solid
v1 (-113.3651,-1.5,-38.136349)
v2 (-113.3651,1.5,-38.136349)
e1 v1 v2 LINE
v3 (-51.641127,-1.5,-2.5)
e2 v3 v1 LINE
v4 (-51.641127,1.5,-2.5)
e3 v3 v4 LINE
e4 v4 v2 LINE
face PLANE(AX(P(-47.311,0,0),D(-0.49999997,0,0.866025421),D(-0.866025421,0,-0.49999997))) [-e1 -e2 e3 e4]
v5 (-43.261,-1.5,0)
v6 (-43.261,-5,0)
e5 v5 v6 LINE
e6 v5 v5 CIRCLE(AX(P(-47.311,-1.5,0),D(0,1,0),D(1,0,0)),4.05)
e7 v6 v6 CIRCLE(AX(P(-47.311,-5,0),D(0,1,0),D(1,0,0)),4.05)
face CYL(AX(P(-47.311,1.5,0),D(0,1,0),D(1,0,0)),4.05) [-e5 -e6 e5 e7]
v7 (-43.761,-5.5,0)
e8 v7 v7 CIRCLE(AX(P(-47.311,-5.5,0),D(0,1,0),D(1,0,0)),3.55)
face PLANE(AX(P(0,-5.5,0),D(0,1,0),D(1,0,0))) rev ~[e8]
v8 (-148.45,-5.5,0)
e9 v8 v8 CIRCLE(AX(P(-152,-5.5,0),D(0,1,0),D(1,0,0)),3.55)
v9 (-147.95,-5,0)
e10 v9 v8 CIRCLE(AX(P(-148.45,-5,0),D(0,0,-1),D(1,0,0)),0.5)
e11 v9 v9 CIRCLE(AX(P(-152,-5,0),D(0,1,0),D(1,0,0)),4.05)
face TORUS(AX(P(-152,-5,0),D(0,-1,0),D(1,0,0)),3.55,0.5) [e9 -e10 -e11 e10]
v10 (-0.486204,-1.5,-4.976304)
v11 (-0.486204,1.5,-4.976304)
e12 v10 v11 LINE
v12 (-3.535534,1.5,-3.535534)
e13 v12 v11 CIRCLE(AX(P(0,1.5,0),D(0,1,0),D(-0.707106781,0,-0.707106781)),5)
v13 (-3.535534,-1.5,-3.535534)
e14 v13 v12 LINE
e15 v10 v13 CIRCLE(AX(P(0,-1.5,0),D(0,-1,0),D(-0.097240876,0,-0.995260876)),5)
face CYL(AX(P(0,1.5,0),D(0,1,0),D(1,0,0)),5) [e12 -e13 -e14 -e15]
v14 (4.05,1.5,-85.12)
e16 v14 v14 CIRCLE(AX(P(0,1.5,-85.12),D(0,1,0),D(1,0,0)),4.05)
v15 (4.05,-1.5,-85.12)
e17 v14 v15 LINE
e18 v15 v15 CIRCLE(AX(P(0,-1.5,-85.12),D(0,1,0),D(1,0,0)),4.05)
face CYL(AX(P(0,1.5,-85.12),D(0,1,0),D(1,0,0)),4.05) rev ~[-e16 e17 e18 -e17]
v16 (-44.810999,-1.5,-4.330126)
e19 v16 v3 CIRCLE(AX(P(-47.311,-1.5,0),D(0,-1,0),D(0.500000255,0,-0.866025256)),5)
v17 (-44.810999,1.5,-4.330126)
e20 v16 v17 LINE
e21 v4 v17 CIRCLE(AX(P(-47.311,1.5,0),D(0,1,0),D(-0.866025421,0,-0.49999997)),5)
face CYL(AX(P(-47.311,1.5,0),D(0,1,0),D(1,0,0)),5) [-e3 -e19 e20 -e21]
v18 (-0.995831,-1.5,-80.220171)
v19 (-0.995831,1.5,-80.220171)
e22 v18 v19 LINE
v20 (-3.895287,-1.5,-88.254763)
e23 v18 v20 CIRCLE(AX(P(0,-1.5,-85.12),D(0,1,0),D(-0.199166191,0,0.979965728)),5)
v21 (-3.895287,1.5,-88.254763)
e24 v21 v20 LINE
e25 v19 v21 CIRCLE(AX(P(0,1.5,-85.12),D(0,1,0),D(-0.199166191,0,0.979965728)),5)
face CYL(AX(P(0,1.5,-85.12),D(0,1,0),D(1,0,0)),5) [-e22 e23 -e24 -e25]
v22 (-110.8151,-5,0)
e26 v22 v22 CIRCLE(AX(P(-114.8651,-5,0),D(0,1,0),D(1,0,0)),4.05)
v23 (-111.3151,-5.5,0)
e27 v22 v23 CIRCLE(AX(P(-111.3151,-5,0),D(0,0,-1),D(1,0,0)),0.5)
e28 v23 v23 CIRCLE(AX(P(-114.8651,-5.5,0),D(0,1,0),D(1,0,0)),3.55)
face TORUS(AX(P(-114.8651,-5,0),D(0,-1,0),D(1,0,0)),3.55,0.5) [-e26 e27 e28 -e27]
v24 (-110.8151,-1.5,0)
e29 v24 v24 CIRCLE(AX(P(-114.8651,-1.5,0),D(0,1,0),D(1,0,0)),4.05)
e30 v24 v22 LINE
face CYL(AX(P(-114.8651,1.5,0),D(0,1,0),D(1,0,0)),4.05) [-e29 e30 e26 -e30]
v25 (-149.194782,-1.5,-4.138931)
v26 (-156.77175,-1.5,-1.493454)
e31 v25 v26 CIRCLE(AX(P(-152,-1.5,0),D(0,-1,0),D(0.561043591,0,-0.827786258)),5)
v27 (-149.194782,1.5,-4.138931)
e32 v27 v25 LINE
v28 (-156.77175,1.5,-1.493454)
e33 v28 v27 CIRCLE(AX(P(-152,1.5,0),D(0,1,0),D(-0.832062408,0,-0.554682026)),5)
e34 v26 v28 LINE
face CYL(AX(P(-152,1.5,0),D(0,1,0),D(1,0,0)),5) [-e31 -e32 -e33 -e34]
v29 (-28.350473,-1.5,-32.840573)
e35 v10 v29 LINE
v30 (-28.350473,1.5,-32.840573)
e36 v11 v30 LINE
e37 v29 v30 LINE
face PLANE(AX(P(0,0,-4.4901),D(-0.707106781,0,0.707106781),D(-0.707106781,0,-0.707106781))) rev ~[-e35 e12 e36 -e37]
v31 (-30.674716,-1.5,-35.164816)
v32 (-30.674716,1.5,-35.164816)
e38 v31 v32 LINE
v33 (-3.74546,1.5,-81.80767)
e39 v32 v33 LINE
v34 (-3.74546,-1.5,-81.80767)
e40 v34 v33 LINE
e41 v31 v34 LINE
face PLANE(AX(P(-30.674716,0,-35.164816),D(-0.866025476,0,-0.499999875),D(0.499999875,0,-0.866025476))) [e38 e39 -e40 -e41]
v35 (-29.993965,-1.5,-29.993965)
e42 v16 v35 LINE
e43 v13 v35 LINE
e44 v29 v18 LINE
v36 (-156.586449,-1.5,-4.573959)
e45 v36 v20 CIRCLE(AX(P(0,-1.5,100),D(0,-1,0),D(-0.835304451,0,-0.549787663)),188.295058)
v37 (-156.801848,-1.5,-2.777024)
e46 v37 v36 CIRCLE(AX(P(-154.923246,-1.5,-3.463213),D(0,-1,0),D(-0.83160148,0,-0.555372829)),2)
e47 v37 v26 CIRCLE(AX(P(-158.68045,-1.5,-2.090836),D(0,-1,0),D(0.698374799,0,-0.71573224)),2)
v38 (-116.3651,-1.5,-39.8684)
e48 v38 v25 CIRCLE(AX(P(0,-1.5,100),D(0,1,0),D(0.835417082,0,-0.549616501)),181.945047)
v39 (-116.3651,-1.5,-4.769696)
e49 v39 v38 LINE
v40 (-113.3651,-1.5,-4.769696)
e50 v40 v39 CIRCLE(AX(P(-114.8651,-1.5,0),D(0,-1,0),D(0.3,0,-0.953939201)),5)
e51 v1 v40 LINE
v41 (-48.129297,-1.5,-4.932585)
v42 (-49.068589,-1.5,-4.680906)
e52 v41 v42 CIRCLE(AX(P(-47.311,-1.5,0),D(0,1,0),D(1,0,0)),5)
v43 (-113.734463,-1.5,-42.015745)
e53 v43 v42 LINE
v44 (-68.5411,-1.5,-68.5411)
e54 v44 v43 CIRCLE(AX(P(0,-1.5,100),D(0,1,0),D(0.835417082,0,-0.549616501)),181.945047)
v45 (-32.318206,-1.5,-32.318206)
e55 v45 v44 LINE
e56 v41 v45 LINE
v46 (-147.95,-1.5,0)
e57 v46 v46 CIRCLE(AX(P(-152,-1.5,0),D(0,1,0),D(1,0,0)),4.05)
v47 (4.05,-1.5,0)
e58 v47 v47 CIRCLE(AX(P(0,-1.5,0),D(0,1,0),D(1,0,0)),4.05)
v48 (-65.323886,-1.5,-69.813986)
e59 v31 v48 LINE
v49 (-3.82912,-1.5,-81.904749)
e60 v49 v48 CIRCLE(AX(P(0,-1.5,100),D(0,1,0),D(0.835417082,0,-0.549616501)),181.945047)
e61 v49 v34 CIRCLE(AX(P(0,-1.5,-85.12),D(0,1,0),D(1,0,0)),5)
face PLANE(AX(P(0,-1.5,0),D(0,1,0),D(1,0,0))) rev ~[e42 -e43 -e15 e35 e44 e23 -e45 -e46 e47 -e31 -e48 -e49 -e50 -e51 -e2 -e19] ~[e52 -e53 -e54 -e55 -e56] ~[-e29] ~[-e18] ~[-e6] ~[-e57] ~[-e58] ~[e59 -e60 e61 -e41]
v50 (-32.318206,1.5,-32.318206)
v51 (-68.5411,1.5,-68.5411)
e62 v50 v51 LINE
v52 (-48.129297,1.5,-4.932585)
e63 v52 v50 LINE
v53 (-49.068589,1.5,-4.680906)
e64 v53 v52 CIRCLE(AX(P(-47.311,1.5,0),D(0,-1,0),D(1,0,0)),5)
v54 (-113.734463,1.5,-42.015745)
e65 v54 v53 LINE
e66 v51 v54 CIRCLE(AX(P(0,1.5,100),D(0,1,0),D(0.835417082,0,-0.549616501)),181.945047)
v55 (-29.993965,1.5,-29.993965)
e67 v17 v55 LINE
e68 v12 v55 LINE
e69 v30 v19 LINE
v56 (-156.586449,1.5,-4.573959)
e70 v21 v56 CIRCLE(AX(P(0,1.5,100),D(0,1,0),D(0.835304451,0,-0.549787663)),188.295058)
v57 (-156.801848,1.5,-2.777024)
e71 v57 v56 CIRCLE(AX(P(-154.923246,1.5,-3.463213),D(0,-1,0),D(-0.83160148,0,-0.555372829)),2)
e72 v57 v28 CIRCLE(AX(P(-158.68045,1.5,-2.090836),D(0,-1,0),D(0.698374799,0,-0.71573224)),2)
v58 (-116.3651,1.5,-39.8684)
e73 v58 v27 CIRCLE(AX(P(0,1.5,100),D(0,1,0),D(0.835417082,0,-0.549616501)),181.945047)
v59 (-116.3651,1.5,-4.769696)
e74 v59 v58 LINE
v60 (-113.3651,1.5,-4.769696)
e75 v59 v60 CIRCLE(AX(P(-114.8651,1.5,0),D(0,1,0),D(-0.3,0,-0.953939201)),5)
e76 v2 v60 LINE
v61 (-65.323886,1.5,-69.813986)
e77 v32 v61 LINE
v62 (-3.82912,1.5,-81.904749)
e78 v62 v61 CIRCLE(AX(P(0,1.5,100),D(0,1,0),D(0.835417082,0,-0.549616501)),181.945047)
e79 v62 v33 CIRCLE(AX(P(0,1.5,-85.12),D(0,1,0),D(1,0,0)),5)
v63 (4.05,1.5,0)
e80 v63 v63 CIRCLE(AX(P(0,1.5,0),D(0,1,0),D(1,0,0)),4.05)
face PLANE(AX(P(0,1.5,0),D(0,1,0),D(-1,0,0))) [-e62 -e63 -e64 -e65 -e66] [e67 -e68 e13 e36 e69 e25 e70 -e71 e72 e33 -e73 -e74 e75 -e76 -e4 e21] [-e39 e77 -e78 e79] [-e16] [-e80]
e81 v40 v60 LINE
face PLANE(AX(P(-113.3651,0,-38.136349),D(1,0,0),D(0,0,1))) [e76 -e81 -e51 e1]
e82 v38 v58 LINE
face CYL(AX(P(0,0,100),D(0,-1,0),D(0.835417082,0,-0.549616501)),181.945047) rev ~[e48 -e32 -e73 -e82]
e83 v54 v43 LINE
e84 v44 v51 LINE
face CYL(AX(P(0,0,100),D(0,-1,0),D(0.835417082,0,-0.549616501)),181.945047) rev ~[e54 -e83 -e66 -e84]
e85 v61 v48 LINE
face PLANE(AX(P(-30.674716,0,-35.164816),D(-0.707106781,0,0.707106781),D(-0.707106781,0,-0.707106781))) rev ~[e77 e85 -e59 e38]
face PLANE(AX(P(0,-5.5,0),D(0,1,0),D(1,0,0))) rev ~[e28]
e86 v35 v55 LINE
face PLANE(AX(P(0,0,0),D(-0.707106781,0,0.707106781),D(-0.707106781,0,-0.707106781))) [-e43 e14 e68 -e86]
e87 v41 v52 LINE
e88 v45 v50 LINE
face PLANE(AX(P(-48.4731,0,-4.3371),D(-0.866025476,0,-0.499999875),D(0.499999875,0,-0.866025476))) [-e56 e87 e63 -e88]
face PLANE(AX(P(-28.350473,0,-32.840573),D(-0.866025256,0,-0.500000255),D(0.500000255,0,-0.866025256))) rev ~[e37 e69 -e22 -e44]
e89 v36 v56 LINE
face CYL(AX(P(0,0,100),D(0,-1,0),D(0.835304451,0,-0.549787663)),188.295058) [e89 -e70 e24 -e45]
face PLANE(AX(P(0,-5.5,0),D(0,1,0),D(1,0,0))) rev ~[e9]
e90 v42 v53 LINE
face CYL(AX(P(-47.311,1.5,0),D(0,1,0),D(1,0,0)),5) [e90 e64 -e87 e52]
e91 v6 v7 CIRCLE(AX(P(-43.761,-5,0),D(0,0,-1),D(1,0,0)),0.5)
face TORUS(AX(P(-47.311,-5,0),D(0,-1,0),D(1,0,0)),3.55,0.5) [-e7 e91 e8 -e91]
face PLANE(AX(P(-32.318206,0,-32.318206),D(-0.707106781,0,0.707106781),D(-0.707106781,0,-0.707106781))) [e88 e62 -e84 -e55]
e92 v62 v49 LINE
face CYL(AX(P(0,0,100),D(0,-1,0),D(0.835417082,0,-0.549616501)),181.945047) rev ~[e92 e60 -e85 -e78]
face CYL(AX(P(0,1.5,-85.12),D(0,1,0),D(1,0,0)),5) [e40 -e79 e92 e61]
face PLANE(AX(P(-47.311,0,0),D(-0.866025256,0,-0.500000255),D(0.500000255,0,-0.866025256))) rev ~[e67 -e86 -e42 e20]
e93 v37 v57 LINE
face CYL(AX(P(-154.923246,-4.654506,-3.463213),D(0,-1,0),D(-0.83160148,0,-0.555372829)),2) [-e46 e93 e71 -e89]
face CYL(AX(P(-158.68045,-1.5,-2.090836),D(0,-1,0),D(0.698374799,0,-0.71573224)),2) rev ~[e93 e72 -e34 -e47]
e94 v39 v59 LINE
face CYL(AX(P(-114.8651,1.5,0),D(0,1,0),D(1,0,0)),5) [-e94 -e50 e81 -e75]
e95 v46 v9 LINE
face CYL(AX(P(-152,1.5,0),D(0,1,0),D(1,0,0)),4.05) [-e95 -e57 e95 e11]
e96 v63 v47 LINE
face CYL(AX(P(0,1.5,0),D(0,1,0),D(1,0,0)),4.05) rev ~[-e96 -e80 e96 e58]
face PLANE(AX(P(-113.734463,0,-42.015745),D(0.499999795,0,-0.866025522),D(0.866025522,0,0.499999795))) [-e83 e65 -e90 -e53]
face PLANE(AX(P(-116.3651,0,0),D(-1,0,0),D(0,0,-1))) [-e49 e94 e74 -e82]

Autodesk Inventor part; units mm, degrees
ref_plane "YZ Plane" through (0, 0, 0) normal (1, 0, 0) x (0, 1, 0)
ref_plane "XZ Plane" through (0, 0, 0) normal (0, 1, 0) x (-1, 0, 0)
ref_plane "XY Plane" through (0, 0, 0) normal (0, 0, 1) x (1, 0, 0)
sketch "Sketch1" plane through (0, 0, 0) normal (0, 1, 0) x (-1, 0, 0)
  arc A0 (-152, 0) -> (152, 0) centre (0, 100) ccw
  line L0 (0, -81.945) -> (-47.311, 0)
  line L1 (-47.311, 0) -> (47.311, 0) construction
  line L2 (47.311, 0) -> (0, -81.945)
  line L3 (0, 0) -> (68.5411, -68.5411)
  line L4 (0, 0) -> (-68.5411, -68.5411)
  line L5 (47.311, 0) -> (116.3651, -39.8684)
  line L6 (-47.311, 0) -> (-116.3651, -39.8684)
  line L7 (114.7776, -42.618) -> (48.4731, -4.3371)
  line L8 (48.4731, -4.3371) -> (0, -88.295)
  line L9 (0, -88.295) -> (-48.4731, -4.3371)
  line L10 (-48.4731, -4.3371) -> (-114.4332, -42.4192)
  line L11 (-66.0999, -70.5901) -> (0, -4.4901)
  line L12 (0, -4.4901) -> (66.2961, -70.7862)
  line L13 (116.3651, -39.8684) -> (114.7776, -42.618)
  line L14 (68.5411, -68.5411) -> (66.2961, -70.7862)
  line L15 (-66.0999, -70.5901) -> (-67.8825, -68.8075)
  line L16 (-114.4332, -42.4192) -> (-115.4867, -40.5945)
  arc A1 (-157.2837, -3.5223) -> (157.2837, -3.5223) centre (0, 100) ccw
  line L17 (157.2837, -3.5223) -> (152, 0)
  line L18 (-152, 0) -> (-157.2837, -3.5223)
  line L19 (116.3651, -39.8684) -> (113.3651, -39.8684)
  line L20 (113.3651, -39.8684) -> (113.3651, 0)
  line L21 (113.3651, 0) -> (116.3651, 0)
  line L22 (116.3651, 0) -> (116.3651, -39.8684)
  line L23 (0, 0) -> (0, -27.315) construction
  line L24 (-116.3651, -39.8684) -> (-113.3651, -39.8684)
  line L25 (-113.3651, -39.8684) -> (-113.3651, 0)
  line L26 (-113.3651, 0) -> (-116.3651, 0)
  line L27 (-116.3651, 0) -> (-116.3651, -39.8684)
  point P0 (-3.6878, -81.9077)
  point P1 (-65.3239, -69.814)
  point P2 (-30.6747, -35.1649)
  point P3 (29.994, -29.994)
  point P4 (-29.994, -29.994)
  point P5 (32.3182, -32.3182)
  point P6 (113.7344, -42.0158)
  point P7 (30.6747, -35.1649)
  point P8 (65.3239, -69.814)
  point P9 (3.6878, -81.9077)
  point P10 (-28.3505, -32.8406)
  point P11 (28.3505, -32.8406)
  point P12 (-32.3182, -32.3182)
  point P13 (-113.7344, -42.0158)
  point P14 (-113.3651, -38.1363)
  point P15 (113.3651, -38.1363)
  point P16 (0, 0)
  dimension "d0" = 152
  dimension "d1" = 152
  dimension "d2" = 100
  dimension "d3" = 0
  dimension "d4" = 45
  dimension "d8" = 3.175
  dimension "d9" = 3.175
  dimension "d10" = 6.35
  dimension "d11" = 6.35
  dimension "d12" = 3.5223
  dimension "d13" = 3.5223
  dimension "d29" = 3
  dimension "d30" = 157.2837
extrude "Extrusion1" add sketch "Sketch1" along normal mid plane 3 contours A0 L16 L10 L15 L11 L9 A1 L18 | L24 L25 L6 L0 L4 L9 L10 A0 | L27 L26 L25 L6 | L6 L25 L24 | A0 L10 L16 | L9 A0 L8 | L8 A0 L12 L14 L7 L13 L17 A1 | A0 L2 L12 L8 | L9 L11 L0 A0 | L4 L9 L11 A0 | L4 L3 L2 L12 L11 L0 | L0 L11 L9 L4 | L12 L8 L3 A0 | A0 L14 L12 | L12 L2 L3 L8 | L11 L15 A0 | L3 L2 L5 L20 L19 A0 L7 L8 | L13 L7 A0 | L19 L20 L5 | L5 L20 L21 L22
sketch "Sketch2" plane through (0, 1.5, 0) normal (0, 1, 0) x (1, 0, 0)
  line L0 (0, 0) -> (29.994, 29.994) projected
  line L1 (0, 0) -> (200, 0)
  line L2 (200, 0) -> (200, 200)
  line L3 (200, 200) -> (0, 200)
  line L4 (0, 200) -> (0, 0)
  dimension "d16" = 200
  dimension "d17" = 200
extrude "Extrusion2" cut sketch "Sketch2" along normal through all both and the other way through all
sketch "Sketch3" plane through (0, 1.5, 0) normal (0, 1, 0) x (1, 0, 0)
  line L0 (-29.994, 29.994) -> (0, 0) projected
  circle A0 centre (0, 0) radius 5
  line L1 (-157.2837, 3.5223) -> (-152, 0) projected
  line L2 (-47.311, 0) -> (-29.994, 29.994) projected
  circle A1 centre (-47.311, 0) radius 5
  line L3 (0, 81.945) -> (0, 88.295) projected
  circle A2 centre (0, 85.12) radius 5
  circle A3 centre (-152, 0) radius 5
  line L4 (-116.3651, 0) -> (-113.3651, 0) projected
  circle A4 centre (-114.8651, 0) radius 5
  dimension "d20" = 10
extrude "Circular_Mounts" add sketch "Sketch3" against normal blind 3
sketch "Sketch4" plane through (0, 1.5, 0) normal (0, 1, 0) x (1, 0, 0)
  arc A0 (-51.6411, 2.5) -> (-44.811, 4.3301) centre (-47.311, 0) ccw projected
  circle A1 centre (-47.311, 0) radius 4.05
  circle A2 centre (0, 0) radius 4.05
  arc A3 (-156.1603, 2.7735) -> (-149.1948, 4.1389) centre (-152, 0) ccw projected
  circle A4 centre (-152, 0) radius 4.05
  arc A5 (-0.9958, 80.2202) -> (-3.8953, 88.2548) centre (0, 85.12) ccw projected
  circle A6 centre (0, 85.12) radius 4.05
  arc A7 (-116.3651, 4.7697) -> (-113.3651, 4.7697) centre (-114.8651, 0) ccw projected
  circle A8 centre (-114.8651, 0) radius 4.05
  dimension "d23" = 8.1
extrude "Inserts" add sketch "Sketch4" against normal blind 7
fillet "Fillet2" radius 0.5 5 edges at (-156.05, -5.5, 0) (-51.361, -5.5, 0) (-4.05, -5.5, 0) (-4.05, -5.5, -85.12) (-118.9151, -5.5, 0)
fillet "Fillet3" radius 2 2 edges at (-156.1603, 0, -2.7735) (-157.2837, 0, -3.5223)
extrude "Extrusion5" cut sketch "Sketch4" along normal through all both and the other way through all contours A2 | A6
equation "\"d1\" = d0"
properties part number "E-Support" material "ABS Plastic"
